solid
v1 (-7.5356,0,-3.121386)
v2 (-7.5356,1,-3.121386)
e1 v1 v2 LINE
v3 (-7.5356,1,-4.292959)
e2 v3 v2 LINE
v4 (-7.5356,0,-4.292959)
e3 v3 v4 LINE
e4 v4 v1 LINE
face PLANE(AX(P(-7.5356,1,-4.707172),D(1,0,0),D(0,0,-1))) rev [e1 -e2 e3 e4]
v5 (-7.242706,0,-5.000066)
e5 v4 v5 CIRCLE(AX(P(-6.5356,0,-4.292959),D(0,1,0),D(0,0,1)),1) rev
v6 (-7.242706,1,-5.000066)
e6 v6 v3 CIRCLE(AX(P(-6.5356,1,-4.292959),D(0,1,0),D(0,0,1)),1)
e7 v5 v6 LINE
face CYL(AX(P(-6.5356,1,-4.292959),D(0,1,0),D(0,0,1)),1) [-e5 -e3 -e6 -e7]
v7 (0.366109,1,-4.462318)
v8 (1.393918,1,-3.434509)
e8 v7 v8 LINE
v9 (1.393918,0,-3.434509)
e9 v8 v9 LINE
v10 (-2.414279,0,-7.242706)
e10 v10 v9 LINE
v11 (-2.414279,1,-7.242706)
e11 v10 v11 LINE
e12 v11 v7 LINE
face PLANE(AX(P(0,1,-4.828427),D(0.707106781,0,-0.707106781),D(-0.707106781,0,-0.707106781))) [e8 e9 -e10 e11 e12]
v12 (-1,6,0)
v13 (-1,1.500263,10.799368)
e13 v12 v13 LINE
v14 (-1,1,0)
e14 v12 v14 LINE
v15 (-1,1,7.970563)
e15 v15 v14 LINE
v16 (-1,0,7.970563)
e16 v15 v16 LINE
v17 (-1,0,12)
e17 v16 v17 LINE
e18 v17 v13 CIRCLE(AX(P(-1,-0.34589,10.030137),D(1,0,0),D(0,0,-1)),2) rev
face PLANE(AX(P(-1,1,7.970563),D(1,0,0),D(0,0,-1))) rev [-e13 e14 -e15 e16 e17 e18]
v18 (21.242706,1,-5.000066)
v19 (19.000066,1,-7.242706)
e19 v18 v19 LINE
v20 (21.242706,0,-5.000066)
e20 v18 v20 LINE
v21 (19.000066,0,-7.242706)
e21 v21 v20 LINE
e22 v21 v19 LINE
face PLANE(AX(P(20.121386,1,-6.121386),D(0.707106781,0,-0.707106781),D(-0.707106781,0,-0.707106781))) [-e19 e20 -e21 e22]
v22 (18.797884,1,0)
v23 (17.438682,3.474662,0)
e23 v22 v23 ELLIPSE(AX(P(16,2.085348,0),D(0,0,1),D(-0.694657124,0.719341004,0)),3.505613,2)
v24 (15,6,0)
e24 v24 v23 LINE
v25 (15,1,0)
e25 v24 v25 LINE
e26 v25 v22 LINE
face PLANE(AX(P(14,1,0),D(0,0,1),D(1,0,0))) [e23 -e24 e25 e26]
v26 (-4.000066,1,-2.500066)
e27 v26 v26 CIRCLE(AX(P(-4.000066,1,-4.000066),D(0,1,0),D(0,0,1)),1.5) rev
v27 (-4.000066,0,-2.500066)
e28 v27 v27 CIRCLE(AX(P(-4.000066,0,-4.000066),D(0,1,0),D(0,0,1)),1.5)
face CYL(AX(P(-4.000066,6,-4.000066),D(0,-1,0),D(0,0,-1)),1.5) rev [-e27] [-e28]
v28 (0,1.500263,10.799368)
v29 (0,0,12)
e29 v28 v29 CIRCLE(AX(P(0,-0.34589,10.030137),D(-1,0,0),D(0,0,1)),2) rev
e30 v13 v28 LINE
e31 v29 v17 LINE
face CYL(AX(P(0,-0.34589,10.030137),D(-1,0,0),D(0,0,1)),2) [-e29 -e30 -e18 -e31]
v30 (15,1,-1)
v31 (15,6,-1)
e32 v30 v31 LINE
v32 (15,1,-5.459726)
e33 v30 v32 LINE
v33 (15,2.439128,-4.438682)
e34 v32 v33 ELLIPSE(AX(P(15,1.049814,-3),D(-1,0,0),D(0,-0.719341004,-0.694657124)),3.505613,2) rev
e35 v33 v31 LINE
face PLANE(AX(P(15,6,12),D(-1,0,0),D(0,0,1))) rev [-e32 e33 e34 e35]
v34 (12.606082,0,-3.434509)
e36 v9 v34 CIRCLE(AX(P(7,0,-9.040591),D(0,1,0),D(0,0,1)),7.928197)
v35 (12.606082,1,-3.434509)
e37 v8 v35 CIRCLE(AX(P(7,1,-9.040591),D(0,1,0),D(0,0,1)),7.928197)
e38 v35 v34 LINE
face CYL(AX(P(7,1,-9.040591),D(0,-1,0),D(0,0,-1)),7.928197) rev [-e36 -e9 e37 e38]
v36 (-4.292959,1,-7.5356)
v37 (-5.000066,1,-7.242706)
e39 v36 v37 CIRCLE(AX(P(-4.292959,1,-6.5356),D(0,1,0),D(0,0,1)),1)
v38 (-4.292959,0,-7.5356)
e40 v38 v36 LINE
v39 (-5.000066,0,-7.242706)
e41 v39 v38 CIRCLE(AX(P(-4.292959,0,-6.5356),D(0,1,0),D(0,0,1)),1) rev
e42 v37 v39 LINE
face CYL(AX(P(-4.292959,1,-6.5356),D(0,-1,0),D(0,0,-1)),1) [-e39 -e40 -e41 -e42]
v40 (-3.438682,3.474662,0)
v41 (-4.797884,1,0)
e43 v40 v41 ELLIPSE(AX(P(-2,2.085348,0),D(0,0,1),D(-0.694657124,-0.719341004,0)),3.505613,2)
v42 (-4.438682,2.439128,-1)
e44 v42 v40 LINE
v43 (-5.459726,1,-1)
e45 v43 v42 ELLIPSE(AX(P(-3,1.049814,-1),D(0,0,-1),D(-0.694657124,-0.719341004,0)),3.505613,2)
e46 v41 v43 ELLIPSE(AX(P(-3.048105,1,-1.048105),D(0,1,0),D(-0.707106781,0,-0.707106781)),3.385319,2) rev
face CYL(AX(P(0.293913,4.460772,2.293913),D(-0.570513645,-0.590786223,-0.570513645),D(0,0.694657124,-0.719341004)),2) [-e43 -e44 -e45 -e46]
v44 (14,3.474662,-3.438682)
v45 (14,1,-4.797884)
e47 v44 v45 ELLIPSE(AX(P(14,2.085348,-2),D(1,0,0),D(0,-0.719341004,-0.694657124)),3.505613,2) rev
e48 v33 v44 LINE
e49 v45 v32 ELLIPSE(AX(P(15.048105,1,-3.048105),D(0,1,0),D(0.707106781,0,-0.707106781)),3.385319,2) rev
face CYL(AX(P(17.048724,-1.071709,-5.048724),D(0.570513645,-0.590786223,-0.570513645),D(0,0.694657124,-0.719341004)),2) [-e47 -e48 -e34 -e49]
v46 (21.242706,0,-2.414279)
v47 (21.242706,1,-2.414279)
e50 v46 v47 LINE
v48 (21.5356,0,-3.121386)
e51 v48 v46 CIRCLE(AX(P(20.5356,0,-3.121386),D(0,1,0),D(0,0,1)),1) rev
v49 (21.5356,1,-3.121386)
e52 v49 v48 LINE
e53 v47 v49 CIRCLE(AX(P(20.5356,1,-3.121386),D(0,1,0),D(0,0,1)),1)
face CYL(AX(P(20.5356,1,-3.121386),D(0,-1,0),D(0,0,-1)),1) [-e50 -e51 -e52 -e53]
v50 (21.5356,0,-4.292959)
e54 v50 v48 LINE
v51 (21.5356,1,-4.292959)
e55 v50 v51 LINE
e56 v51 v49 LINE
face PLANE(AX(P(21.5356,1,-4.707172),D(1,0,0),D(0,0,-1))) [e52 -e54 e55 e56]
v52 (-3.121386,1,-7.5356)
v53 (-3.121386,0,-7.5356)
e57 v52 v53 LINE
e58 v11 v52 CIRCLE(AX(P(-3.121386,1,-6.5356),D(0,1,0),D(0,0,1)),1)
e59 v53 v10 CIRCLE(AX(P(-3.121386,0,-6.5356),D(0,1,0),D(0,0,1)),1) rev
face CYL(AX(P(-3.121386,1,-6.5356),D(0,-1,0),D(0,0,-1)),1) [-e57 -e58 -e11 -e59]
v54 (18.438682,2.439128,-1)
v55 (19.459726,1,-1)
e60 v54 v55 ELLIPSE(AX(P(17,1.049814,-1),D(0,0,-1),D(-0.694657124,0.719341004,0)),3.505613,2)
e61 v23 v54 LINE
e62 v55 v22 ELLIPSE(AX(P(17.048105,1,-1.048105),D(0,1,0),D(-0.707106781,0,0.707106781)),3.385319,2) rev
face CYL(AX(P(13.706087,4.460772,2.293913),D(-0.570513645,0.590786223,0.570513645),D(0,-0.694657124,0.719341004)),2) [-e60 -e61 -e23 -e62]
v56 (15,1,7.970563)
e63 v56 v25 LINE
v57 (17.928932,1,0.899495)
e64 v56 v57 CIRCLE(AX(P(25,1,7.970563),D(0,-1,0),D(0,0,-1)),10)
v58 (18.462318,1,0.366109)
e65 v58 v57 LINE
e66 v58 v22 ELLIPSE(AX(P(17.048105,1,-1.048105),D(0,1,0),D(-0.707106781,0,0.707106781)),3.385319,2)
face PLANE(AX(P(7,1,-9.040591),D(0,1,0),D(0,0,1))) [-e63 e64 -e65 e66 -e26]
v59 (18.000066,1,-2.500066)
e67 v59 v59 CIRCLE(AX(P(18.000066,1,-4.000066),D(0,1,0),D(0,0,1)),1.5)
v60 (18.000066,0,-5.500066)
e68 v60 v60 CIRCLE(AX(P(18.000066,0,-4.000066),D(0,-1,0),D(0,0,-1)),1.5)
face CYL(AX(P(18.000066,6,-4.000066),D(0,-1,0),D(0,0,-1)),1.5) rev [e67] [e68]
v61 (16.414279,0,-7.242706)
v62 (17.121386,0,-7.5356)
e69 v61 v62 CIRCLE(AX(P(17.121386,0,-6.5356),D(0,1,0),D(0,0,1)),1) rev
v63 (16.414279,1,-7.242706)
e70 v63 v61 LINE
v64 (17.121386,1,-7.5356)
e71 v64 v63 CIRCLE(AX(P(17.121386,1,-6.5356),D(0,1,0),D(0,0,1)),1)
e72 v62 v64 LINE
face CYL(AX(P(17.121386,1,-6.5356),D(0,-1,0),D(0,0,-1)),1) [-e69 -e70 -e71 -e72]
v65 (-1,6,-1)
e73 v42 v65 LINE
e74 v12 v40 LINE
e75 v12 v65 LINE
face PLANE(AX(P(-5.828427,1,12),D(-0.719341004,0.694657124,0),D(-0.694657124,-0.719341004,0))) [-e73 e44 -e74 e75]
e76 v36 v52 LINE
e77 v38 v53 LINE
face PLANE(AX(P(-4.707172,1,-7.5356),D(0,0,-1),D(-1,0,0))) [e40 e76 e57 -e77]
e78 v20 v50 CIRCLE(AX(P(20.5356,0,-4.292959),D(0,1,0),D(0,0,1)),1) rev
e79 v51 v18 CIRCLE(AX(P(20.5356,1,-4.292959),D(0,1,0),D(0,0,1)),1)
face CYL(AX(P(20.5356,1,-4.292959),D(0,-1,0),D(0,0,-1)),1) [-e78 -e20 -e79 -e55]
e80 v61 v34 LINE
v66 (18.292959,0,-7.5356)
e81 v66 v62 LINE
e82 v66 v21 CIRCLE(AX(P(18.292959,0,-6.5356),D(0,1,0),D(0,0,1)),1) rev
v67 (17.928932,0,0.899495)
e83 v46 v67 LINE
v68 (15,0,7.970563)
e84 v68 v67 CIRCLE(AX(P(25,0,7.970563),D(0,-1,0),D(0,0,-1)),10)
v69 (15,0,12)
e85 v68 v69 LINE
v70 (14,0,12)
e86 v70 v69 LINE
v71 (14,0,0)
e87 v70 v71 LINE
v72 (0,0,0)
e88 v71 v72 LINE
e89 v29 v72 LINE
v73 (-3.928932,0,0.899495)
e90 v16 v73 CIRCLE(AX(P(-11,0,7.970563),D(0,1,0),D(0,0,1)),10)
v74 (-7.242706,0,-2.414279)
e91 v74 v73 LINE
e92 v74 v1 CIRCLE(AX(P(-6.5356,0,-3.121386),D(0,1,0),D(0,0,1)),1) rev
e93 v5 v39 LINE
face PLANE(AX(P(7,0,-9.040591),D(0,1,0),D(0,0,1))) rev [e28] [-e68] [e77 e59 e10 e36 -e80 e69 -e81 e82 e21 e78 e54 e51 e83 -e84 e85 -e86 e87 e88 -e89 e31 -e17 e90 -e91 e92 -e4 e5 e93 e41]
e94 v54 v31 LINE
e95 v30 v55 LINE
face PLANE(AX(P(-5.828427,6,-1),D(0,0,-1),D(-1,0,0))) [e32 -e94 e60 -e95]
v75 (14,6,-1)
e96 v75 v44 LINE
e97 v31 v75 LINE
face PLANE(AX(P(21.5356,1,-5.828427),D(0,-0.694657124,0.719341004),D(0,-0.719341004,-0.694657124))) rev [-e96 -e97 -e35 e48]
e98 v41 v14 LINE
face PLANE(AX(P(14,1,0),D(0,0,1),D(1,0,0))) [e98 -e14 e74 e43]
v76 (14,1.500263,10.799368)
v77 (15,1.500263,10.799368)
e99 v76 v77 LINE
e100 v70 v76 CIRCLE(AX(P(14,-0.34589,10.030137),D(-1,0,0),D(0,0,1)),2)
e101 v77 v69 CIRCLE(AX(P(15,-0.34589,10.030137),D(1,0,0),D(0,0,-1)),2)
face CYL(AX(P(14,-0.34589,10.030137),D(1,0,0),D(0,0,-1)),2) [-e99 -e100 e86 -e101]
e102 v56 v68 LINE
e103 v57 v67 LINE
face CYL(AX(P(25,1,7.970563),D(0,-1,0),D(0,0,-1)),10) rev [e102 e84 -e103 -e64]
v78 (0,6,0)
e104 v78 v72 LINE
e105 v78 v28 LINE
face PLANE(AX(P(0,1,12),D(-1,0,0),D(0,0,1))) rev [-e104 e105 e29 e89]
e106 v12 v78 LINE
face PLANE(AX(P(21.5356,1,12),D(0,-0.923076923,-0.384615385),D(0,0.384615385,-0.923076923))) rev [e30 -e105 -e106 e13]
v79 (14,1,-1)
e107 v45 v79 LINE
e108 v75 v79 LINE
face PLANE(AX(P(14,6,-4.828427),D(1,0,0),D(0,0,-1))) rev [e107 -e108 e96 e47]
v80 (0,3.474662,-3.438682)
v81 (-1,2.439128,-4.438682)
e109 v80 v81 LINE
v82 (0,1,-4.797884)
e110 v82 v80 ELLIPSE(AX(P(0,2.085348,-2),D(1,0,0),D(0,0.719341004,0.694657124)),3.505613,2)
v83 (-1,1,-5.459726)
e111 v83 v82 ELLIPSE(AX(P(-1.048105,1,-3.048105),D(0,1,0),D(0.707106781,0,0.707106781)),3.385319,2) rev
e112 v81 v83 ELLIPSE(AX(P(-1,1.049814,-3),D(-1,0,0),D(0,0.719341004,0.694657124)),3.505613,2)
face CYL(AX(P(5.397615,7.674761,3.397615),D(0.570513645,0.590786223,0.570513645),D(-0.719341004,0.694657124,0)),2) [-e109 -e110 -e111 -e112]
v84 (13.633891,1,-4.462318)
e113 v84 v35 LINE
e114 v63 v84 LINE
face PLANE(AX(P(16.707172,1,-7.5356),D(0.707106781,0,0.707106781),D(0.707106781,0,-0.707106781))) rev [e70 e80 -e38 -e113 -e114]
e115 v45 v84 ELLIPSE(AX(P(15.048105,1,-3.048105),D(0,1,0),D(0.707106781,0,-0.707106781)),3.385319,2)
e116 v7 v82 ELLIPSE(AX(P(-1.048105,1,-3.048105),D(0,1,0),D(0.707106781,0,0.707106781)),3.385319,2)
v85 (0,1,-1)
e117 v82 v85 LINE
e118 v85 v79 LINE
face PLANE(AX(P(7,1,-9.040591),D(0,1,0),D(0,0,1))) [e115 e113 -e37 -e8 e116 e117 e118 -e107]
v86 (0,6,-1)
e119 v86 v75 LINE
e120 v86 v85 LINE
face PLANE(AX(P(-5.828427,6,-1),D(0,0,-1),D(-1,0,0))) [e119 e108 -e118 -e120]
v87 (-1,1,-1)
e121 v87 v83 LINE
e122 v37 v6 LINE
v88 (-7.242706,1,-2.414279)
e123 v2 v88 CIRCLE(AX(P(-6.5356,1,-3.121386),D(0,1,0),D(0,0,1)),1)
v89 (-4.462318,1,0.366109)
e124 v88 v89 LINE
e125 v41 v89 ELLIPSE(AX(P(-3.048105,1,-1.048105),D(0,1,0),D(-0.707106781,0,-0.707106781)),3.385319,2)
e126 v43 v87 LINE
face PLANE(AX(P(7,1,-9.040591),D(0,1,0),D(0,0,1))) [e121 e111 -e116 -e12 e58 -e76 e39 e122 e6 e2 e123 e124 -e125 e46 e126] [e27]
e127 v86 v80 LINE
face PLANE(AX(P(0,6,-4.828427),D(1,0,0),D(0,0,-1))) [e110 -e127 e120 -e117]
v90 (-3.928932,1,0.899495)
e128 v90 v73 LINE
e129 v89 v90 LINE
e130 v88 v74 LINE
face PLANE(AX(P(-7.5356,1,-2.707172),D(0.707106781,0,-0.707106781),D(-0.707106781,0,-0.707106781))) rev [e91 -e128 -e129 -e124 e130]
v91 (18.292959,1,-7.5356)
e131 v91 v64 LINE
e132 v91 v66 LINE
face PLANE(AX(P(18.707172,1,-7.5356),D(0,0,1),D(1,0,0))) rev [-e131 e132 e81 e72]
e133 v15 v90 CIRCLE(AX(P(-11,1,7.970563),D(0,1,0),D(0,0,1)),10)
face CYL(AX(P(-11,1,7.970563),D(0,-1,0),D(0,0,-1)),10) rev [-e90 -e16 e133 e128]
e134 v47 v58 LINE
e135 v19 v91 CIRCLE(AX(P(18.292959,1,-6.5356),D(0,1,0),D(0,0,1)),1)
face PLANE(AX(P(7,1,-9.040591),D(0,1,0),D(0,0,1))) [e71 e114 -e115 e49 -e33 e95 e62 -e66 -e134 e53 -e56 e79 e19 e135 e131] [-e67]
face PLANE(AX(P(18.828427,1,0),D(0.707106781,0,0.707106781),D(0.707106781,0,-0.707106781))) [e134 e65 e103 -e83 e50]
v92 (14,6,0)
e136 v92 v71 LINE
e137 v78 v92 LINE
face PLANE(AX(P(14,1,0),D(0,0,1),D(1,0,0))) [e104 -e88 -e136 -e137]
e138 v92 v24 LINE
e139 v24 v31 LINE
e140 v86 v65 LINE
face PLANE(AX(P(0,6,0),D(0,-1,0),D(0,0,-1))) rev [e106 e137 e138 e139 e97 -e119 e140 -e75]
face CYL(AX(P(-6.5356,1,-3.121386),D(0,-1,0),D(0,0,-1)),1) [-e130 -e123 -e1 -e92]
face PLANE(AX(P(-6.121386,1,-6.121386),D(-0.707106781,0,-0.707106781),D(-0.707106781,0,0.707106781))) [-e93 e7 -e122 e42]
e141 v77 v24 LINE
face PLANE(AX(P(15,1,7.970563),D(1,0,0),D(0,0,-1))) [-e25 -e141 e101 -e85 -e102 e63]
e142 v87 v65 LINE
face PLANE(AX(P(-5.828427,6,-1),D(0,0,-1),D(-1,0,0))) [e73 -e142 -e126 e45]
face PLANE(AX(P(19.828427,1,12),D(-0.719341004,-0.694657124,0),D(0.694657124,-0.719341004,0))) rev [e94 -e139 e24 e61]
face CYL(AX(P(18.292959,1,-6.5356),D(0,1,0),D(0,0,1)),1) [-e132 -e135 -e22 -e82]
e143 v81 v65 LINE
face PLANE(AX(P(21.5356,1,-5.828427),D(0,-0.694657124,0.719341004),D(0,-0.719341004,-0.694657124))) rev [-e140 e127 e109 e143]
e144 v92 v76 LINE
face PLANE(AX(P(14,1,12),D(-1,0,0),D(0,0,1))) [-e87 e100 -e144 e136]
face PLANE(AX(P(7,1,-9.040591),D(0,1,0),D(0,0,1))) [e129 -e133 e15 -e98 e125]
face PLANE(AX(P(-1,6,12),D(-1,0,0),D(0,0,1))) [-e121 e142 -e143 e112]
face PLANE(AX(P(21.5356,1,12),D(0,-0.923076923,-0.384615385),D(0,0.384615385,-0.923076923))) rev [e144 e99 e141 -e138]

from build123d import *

# Parameters (mm, degrees)
BOSS_EXTRUDE5_DEPTH = 1
BOSS_EXTRUDE6_DEPTH = 5
BOSS_EXTRUDE7_DEPTH = 5
BOSS_EXTRUDE8_DEPTH = 5
CUT_EXTRUDE2_DEPTH  = 27.226956509
CUT_EXTRUDE3_DEPTH  = 27.226956509
CUT_EXTRUDE4_DEPTH  = 26.860820726
FILLET1_R           = 1
SKETCH2_10_R        = 1.5
CUT_EXTRUDE5_DEPTH  = 26.372860474
FILLET2_R           = 1
FILLET3_R           = 2


with BuildPart() as part:
    # Sketch2 → Boss-Extrude5 (new body)
    with BuildSketch(Plane(origin=(0, 0, 0), x_dir=(1, 0, 0), z_dir=(0, 1, 0))):
        with BuildLine():
            Line((-2.70717244, 7.535599565), (-1, 5.828427125))
            Line((-1, 5.828427125), (0, 4.828427125))
            Line((0, 4.828427125), (1.393918238, 3.434508886))
            ThreePointArc((1.393918238, 3.434508886), (7, 1.112393789), (12.606081762, 3.434508886))
            Line((12.606081762, 3.434508886), (14, 4.828427125))
            Line((14, 4.828427125), (15, 5.828427125))
            Line((15, 5.828427125), (16.70717244, 7.535599565))
            Line((16.70717244, 7.535599565), (18.70717244, 7.535599565))
            Line((18.70717244, 7.535599565), (20.121386002, 6.121386002))
            Line((20.121386002, 6.121386002), (21.535599565, 4.70717244))
            Line((21.535599565, 4.70717244), (21.535599565, 2.70717244))
            Line((21.535599565, 2.70717244), (19.828427125, 1))
            Line((19.828427125, 1), (18.828427125, 0))
            Line((18.828427125, 0), (17.928932188, -0.899494937))
            ThreePointArc((17.928932188, -0.899494937), (15.761204675, -4.143728425), (15, -7.970562748))
            Line((15, -7.970562748), (15, -12))
            Line((15, -12), (14, -12))
            Line((14, -12), (14, 0))
            Line((14, 0), (0, 0))
            Line((0, 0), (0, -12))
            Line((0, -12), (-1, -12))
            Line((-1, -12), (-1, -7.970562748))
            ThreePointArc((-1, -7.970562748), (-1.761204675, -4.143728425), (-3.928932188, -0.899494937))
            Line((-3.928932188, -0.899494937), (-4.828427125, 0))
            Line((-4.828427125, 0), (-5.828427125, 1))
            Line((-5.828427125, 1), (-7.535599565, 2.70717244))
            Line((-7.535599565, 2.70717244), (-7.535599565, 4.70717244))
            Line((-7.535599565, 4.70717244), (-6.121386002, 6.121386002))
            Line((-6.121386002, 6.121386002), (-4.70717244, 7.535599565))
            Line((-4.70717244, 7.535599565), (-2.70717244, 7.535599565))
        make_face()
    extrude(amount=BOSS_EXTRUDE5_DEPTH)

    # Sketch5 → Boss-Extrude6 (add)
    with BuildSketch(Plane(origin=(0, 1, 0), x_dir=(1, 0, 0), z_dir=(0, 1, 0))):
        Polygon((-4.828427125, 0), (18.828427125, 0), (19.828427125, 1), (-5.828427125, 1), align=None)
    extrude(amount=BOSS_EXTRUDE6_DEPTH)

    # Sketch5<3> → Boss-Extrude7 (add)
    with BuildSketch(Plane(origin=(0, 1, 0), x_dir=(1, 0, 0), z_dir=(0, 1, 0))):
        Polygon((-1, -12), (-1, 5.828427125), (0, 4.828427125), (0, -12), align=None)
    extrude(amount=BOSS_EXTRUDE7_DEPTH)

    # Sketch5<4> → Boss-Extrude8 (add)
    with BuildSketch(Plane(origin=(0, 1, 0), x_dir=(1, 0, 0), z_dir=(0, 1, 0))):
        Polygon((15, -12), (15, 5.828427125), (14, 4.828427125), (14, -12), align=None)
    extrude(amount=BOSS_EXTRUDE8_DEPTH)

    # Sketch6 → Cut-Extrude2 (cut, through all)
    with BuildSketch(Plane.ZY.offset(1)):
        Polygon((12, 1), (0, 6), (12, 6), align=None)
    extrude(amount=-CUT_EXTRUDE2_DEPTH, mode=Mode.SUBTRACT)

    # Sketch7 → Cut-Extrude3 (cut, through all)
    with BuildSketch(Plane.ZY.offset(1)):
        Polygon((-5.828427125, 1), (-1, 6), (-5.828427125, 6), align=None)
    extrude(amount=-CUT_EXTRUDE3_DEPTH, mode=Mode.SUBTRACT)

    # Sketch9 → Cut-Extrude4 (cut, through all)
    with BuildSketch(Plane(origin=(0, 0, -1), x_dir=(-1, 0, 0), z_dir=(0, 0, -1))):
        Polygon((5.828427125, 1), (1, 6), (5.828427125, 6), align=None)
        Polygon((-15, 6), (-19.828427125, 6), (-19.828427125, 1), align=None)
    extrude(amount=-CUT_EXTRUDE4_DEPTH, mode=Mode.SUBTRACT)

    # Fillet1
    fillet1_edges = [part.edges().sort_by_distance(p)[0] for p in [
        (21.535599565, 0.5, -2.70717244),
        (21.535599565, 0.5, -4.70717244),
        (18.70717244, 0.5, -7.535599565),
        (16.70717244, 0.5, -7.535599565),
    ]]
    fillet(fillet1_edges, radius=FILLET1_R)

    # Sketch2<10> → Cut-Extrude5 (cut, through all)
    with BuildSketch(Plane(origin=(0, 0, 0), x_dir=(1, 0, 0), z_dir=(0, 1, 0))):
        with Locations(Location((-4.000065659, 4.000065659, 0), (0, 0, 270))):
            Circle(SKETCH2_10_R)
        with Locations(Location((18.000065659, 4.000065659, 0), (0, 0, 90))):
            Circle(SKETCH2_10_R)
    extrude(amount=CUT_EXTRUDE5_DEPTH, mode=Mode.SUBTRACT)

    # Fillet2
    fillet2_edges = [part.edges().sort_by_distance(p)[0] for p in [
        (-4.70717244, 0.5, -7.535599565),
        (-7.535599565, 0.5, -4.70717244),
        (-7.535599565, 0.5, -2.70717244),
        (-2.70717244, 0.5, -7.535599565),
    ]]
    fillet(fillet2_edges, radius=FILLET2_R)

    # Fillet3
    # the kernel refuses this fillet: 2 mm, written as the material it takes off along each edge
    with BuildSketch(Plane(origin=(16.627933811, -0.685780658, -7.456360936), x_dir=(-0.41774894469873675, -0.8068281343670279, 0.4177489446987422), z_dir=(-0.5705136450630144, 0.5907862232600055, 0.5705136450630186))) as fillet3_piece_1_section:
        with BuildLine():
            CenterArc((FILLET3_R * 0.570690578744, FILLET3_R), FILLET3_R, 210.574008732, 59.425991268)
            Line((-FILLET3_R * 0.290282277773, FILLET3_R * 0.491349097769), (0, 0))
            Line((0, 0), (FILLET3_R * 0.570690578744, 0))
        make_face()
    fillet3_piece_1 = extrude(amount=7.459712243, mode=Mode.PRIVATE)
    fillet3_piece_1 = split(fillet3_piece_1, bisect_by=Plane(origin=(16.627933811, 1, -7.456360936), z_dir=(0, 1, 0)), keep=Keep.TOP, mode=Mode.PRIVATE)
    add(fillet3_piece_1, mode=Mode.SUBTRACT)
    with BuildSketch(Plane(origin=(1.627933811, 3.721314564, -3.200493313), x_dir=(0.41774894469873974, -0.8068281343670296, 0.41774894469873625), z_dir=(-0.5705136450630193, -0.5907862232600034, -0.5705136450630159))) as fillet3_piece_2_section:
        with BuildLine():
            CenterArc((FILLET3_R * 0.570690578744, FILLET3_R), FILLET3_R, 210.574008732, 59.425991268)
            Line((-FILLET3_R * 0.290282277773, FILLET3_R * 0.491349097769), (0, 0))
            Line((0, 0), (FILLET3_R * 0.570690578744, 0))
        make_face()
    fillet3_piece_2 = extrude(amount=7.459712243, mode=Mode.PRIVATE)
    fillet3_piece_2 = split(fillet3_piece_2, bisect_by=Plane(origin=(1.627933811, 1, -3.200493313), z_dir=(0, 1, 0)), keep=Keep.TOP, mode=Mode.PRIVATE)
    add(fillet3_piece_2, mode=Mode.SUBTRACT)
    with BuildSketch(Plane(origin=(-3.200493313, 3.721314564, 1.627933811), x_dir=(0.417748944698757, -0.8068281343670092, 0.4177489446987582), z_dir=(-0.570513645063002, -0.5907862232600312, -0.5705136450630045))) as fillet3_piece_3_section:
        with BuildLine():
            CenterArc((FILLET3_R * 0.570690578744, -FILLET3_R), FILLET3_R, 90, 59.425991268)
            Line((-FILLET3_R * 0.290282277773, -FILLET3_R * 0.491349097769), (0, 0))
            Line((0, 0), (FILLET3_R * 0.570690578744, 0))
        make_face()
    fillet3_piece_3 = extrude(amount=7.459712243, mode=Mode.PRIVATE)
    fillet3_piece_3 = split(fillet3_piece_3, bisect_by=Plane(origin=(-3.200493313, 1, 1.627933811), z_dir=(0, 1, 0)), keep=Keep.TOP, mode=Mode.PRIVATE)
    add(fillet3_piece_3, mode=Mode.SUBTRACT)
    with BuildSketch(Plane(origin=(17.200493313, 3.721314564, 1.627933811), x_dir=(-0.4177489446987597, -0.8068281343670061, 0.41774894469876167), z_dir=(0.5705136450629996, -0.5907862232600355, -0.5705136450630022))) as fillet3_piece_4_section:
        with BuildLine():
            CenterArc((FILLET3_R * 0.570690578744, FILLET3_R), FILLET3_R, 210.574008732, 59.425991268)
            Line((-FILLET3_R * 0.290282277773, FILLET3_R * 0.491349097769), (0, 0))
            Line((0, 0), (FILLET3_R * 0.570690578744, 0))
        make_face()
    fillet3_piece_4 = extrude(amount=7.459712243, mode=Mode.PRIVATE)
    fillet3_piece_4 = split(fillet3_piece_4, bisect_by=Plane(origin=(17.200493313, 1, 1.627933811), z_dir=(0, 1, 0)), keep=Keep.TOP, mode=Mode.PRIVATE)
    add(fillet3_piece_4, mode=Mode.SUBTRACT)
    with BuildSketch(Plane(origin=(10.748288019, 1, 12), x_dir=(0, -1, 0), z_dir=(1, 0, 0)), Plane(origin=(-4.251711981, 1, 12), x_dir=(0, -1, 0), z_dir=(1, 0, 0))) as fillet3_piece_5:
        with BuildLine():
            CenterArc((1.345890464, 1.969862885), FILLET3_R, 202.619864948, 57.421029607)
            Line((-0.500263382, 1.200632116), (0, 0))
            Line((0, 0), (1, 0))
        make_face()
    extrude(amount=7.503423962, mode=Mode.SUBTRACT)


solid = part.part
